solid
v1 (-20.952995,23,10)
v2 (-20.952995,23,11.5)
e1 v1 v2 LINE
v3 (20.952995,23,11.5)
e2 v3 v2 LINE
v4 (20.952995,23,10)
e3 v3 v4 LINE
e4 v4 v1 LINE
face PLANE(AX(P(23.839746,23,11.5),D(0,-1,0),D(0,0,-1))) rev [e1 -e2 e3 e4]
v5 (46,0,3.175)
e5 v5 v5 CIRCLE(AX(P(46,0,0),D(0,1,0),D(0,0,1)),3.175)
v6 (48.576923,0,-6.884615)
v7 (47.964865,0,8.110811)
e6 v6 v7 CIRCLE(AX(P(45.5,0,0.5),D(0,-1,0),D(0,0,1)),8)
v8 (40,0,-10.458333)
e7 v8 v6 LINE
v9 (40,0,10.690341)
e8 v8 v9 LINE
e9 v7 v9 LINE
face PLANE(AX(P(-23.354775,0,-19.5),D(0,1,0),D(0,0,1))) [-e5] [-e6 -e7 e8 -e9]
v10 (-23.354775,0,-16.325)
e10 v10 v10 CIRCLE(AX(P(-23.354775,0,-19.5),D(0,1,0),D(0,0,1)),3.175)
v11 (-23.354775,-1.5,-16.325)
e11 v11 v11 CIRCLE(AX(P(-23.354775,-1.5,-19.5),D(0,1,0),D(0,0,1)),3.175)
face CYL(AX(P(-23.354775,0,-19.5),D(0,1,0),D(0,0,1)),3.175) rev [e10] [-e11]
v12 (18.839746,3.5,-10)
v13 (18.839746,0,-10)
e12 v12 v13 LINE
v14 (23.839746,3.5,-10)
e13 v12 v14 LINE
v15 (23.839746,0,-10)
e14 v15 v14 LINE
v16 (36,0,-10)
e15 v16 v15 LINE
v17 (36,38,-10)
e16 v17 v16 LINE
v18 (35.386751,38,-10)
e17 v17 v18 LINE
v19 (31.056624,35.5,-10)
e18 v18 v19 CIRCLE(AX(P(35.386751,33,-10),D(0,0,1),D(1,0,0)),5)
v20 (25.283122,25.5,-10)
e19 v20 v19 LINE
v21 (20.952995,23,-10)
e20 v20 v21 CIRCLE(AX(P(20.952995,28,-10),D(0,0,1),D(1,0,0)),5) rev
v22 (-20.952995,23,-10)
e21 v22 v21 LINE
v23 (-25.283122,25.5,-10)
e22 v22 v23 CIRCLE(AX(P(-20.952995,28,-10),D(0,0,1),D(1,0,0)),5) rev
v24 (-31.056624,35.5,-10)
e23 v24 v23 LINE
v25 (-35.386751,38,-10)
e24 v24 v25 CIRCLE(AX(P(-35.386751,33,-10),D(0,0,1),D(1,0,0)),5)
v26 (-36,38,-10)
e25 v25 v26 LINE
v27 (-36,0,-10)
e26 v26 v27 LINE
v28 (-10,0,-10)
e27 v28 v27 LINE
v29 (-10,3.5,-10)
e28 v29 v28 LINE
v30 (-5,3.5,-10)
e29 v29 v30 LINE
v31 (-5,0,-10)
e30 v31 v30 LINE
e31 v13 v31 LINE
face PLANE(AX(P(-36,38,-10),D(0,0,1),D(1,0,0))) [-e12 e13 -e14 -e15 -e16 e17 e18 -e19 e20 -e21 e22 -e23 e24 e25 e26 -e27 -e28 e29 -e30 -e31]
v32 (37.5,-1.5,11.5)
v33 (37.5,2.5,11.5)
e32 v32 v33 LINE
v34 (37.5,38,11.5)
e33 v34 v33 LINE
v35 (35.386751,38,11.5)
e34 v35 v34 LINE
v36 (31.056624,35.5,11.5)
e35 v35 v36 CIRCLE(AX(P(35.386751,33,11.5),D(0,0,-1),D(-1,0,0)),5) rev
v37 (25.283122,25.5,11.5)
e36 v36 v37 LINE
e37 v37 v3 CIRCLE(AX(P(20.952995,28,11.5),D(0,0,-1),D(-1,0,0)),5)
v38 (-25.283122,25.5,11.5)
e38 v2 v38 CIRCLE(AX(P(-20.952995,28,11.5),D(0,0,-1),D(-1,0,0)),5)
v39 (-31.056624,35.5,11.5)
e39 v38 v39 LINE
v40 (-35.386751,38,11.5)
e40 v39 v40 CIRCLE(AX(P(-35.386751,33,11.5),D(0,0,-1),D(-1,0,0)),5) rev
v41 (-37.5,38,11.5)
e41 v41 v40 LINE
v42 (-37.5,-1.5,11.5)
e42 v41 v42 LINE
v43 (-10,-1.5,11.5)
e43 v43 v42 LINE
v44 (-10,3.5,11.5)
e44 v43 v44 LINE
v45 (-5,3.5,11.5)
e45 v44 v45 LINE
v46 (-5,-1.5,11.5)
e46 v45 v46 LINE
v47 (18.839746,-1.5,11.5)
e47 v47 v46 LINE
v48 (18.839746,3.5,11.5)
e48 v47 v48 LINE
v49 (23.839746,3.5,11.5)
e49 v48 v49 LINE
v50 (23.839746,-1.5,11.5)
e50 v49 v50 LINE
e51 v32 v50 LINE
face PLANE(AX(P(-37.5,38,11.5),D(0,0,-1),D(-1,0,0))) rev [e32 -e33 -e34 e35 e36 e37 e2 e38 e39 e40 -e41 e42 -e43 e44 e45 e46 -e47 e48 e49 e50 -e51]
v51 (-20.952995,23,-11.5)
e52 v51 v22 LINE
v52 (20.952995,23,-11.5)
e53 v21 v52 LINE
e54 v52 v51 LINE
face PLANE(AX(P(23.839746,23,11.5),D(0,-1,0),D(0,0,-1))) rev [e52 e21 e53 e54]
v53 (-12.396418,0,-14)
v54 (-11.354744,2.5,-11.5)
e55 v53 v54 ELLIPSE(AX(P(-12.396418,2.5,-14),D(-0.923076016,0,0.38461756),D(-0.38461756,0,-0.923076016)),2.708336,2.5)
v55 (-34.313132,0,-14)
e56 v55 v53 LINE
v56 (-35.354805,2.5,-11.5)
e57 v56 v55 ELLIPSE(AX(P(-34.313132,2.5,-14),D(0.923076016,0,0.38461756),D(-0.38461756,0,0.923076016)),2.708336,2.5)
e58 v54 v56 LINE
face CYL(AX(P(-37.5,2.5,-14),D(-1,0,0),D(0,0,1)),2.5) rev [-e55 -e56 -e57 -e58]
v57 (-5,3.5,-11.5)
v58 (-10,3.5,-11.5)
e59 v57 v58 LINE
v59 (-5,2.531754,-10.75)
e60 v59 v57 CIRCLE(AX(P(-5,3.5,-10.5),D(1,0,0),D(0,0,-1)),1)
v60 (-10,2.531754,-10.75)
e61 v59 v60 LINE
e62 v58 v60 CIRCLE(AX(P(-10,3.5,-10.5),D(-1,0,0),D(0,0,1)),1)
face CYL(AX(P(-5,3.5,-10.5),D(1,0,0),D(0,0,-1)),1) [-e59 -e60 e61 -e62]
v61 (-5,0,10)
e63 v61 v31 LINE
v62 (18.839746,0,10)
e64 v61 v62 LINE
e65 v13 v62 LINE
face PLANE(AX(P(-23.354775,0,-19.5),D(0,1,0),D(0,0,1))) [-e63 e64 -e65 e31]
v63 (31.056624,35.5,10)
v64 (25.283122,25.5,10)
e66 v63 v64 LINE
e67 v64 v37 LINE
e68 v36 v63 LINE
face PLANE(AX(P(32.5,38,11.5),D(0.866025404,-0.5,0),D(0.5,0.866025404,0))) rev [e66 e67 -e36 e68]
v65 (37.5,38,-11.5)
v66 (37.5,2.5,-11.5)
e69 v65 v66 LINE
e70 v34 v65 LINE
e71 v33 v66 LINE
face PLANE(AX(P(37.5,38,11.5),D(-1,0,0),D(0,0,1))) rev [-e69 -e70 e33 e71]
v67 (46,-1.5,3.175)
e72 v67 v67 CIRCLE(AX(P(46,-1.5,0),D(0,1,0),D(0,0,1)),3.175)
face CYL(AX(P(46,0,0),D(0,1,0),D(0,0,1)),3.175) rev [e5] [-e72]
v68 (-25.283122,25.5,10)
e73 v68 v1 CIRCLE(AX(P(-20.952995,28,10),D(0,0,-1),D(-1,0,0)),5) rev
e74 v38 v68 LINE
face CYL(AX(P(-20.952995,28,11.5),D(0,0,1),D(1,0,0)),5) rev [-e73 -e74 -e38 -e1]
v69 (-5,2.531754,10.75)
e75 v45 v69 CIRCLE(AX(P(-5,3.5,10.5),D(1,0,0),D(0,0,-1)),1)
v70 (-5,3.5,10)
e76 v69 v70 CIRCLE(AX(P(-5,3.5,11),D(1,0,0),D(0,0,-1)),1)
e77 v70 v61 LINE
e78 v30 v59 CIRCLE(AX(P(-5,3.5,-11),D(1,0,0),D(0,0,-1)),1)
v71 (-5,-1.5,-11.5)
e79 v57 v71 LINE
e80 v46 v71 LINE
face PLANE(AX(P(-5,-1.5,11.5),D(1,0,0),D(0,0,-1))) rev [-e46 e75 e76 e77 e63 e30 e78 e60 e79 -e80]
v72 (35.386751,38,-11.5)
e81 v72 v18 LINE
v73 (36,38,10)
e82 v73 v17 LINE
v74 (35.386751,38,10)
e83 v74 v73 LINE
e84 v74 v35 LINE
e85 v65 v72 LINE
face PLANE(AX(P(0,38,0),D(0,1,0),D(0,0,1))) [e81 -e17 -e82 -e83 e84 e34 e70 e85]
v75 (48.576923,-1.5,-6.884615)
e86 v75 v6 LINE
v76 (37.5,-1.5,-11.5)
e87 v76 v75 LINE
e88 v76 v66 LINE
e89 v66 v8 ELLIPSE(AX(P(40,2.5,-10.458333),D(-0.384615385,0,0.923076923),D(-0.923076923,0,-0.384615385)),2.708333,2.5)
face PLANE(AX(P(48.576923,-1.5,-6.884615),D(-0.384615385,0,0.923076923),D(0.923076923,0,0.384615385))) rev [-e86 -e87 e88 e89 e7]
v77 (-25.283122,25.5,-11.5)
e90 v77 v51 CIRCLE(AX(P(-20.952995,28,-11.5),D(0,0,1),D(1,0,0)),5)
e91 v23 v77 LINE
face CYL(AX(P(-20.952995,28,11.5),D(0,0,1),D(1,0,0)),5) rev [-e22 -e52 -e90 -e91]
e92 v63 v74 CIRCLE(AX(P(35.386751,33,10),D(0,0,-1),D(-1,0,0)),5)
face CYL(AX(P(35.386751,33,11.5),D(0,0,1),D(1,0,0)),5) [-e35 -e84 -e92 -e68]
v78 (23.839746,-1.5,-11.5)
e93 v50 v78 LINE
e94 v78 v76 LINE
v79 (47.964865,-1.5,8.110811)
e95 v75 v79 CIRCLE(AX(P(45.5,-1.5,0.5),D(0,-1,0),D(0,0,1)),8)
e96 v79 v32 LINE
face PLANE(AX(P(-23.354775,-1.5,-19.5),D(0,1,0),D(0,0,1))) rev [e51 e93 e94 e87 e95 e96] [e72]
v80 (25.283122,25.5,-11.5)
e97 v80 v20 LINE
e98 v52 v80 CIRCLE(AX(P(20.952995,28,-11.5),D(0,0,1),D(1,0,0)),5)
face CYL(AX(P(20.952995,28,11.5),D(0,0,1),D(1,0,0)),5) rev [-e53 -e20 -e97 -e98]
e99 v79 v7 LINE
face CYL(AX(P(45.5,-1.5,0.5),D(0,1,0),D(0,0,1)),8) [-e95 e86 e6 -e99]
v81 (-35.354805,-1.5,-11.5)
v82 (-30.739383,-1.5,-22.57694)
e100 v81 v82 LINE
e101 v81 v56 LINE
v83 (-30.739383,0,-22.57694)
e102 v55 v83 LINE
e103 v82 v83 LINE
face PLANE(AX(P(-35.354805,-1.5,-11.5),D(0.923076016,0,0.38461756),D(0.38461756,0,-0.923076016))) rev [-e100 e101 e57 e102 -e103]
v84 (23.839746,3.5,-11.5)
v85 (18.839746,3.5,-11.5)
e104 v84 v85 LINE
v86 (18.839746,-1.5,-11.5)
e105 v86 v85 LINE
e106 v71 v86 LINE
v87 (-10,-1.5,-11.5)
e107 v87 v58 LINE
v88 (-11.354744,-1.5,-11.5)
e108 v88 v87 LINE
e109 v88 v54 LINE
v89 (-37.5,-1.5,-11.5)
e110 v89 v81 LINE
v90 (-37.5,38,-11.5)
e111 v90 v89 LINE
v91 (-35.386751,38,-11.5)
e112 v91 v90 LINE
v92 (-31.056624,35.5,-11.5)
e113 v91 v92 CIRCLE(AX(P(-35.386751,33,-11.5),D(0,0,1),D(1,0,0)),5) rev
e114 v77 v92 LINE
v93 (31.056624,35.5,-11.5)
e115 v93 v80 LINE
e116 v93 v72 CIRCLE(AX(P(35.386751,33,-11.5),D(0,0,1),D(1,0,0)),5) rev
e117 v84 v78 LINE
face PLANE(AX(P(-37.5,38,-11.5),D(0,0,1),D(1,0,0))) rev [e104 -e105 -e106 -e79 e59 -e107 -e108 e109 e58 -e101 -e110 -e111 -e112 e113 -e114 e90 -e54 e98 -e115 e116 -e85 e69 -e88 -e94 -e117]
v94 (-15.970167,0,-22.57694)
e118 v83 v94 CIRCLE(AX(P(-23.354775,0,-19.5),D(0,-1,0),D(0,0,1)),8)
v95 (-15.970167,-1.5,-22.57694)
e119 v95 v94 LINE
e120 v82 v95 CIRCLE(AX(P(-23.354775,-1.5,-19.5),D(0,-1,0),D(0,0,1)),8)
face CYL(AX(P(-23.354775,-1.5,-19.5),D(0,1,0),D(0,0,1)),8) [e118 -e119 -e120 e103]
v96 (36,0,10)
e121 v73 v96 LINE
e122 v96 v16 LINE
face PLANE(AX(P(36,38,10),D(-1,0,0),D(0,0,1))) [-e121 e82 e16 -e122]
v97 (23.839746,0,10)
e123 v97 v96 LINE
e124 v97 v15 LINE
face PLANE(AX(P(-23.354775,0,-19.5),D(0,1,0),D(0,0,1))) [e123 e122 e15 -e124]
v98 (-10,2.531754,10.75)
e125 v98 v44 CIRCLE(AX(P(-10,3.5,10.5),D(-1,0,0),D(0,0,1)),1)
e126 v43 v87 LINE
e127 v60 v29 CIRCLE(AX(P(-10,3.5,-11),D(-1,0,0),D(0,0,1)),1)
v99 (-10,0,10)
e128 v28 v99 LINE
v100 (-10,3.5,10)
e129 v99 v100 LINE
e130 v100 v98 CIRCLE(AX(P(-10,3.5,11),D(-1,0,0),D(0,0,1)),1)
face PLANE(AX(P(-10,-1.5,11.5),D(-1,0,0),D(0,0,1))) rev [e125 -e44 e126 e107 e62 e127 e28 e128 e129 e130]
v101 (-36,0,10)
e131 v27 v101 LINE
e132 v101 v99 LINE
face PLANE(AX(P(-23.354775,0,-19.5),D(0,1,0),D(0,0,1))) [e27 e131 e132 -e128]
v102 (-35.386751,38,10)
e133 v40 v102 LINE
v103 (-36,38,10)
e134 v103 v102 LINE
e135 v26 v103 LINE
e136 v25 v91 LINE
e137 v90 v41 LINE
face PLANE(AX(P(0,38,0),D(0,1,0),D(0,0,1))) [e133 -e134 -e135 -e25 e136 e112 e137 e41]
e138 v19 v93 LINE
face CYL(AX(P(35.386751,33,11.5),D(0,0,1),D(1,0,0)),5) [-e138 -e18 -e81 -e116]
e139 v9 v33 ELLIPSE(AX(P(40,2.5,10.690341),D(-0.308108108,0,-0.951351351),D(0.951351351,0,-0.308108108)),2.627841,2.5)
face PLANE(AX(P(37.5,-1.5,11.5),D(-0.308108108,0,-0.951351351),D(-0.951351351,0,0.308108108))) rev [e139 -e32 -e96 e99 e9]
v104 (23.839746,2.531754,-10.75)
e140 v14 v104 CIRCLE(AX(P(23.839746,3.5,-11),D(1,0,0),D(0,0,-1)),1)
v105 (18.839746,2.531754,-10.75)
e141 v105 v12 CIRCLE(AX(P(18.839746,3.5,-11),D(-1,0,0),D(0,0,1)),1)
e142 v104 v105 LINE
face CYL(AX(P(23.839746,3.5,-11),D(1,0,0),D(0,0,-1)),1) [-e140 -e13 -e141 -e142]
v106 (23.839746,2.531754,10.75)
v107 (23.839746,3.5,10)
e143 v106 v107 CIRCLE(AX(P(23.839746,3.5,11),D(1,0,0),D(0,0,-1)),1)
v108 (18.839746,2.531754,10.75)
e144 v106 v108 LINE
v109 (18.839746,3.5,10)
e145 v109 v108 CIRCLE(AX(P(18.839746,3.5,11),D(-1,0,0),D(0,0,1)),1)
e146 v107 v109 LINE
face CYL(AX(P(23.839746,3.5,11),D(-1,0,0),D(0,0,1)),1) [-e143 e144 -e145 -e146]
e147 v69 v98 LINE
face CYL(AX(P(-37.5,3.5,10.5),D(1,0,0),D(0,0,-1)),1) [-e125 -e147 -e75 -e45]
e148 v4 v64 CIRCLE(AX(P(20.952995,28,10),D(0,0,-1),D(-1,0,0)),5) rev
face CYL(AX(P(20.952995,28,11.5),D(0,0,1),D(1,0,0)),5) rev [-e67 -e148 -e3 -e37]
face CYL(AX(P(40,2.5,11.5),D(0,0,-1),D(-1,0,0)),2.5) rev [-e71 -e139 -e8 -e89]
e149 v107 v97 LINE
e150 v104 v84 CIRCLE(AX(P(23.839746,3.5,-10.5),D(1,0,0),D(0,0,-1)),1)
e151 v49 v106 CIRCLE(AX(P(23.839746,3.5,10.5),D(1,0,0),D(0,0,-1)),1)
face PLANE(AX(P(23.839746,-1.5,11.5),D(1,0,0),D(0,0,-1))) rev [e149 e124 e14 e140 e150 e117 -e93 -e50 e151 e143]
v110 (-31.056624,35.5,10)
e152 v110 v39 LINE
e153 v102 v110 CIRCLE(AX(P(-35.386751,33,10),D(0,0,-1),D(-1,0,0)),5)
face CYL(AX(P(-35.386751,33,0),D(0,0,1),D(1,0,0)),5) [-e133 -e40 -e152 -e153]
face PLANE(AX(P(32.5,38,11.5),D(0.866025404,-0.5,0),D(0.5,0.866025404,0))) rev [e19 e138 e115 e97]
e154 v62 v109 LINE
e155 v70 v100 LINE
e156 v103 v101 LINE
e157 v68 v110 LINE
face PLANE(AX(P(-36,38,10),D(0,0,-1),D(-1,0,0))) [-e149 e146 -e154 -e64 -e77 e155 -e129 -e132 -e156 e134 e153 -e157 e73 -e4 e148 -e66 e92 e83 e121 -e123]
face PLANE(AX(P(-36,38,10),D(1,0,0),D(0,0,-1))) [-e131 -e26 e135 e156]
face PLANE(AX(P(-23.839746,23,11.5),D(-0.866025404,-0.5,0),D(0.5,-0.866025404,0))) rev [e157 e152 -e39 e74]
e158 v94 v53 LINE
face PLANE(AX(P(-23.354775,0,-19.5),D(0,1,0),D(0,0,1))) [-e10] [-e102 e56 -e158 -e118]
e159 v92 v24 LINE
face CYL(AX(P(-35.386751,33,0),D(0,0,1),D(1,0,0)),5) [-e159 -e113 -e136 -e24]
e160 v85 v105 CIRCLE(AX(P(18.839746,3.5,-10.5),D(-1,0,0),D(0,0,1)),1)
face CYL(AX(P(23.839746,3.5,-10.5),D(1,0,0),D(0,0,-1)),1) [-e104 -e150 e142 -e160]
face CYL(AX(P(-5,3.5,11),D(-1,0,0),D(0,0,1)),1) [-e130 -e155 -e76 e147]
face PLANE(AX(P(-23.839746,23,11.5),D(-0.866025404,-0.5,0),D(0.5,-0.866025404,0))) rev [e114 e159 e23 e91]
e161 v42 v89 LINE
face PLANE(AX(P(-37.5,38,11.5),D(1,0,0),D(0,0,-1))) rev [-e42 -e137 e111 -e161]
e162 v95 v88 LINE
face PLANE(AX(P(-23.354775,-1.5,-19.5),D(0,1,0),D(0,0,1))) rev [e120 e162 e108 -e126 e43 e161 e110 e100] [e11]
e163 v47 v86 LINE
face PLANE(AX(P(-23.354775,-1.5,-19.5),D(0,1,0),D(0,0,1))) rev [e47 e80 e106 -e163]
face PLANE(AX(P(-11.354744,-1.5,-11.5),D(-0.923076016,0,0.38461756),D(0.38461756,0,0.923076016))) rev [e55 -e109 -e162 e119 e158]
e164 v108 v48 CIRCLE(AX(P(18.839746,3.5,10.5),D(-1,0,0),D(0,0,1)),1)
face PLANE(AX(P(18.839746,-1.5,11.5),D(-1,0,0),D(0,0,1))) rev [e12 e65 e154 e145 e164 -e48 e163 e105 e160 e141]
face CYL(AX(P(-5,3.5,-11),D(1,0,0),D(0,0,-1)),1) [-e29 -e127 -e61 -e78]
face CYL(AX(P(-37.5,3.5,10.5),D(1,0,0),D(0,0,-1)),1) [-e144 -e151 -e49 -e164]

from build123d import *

# Parameters (mm, degrees)
SKETCH15_W                  = 75
SKETCH15_H                  = 23
SKETCH15_W_2                = 72
SKETCH15_H_2                = 20
BOSS_EXTRUDE8_DEPTH         = 38
BOSS_EXTRUDE11_DEPTH        = 1.5
F_1_4_0_25_DIAMETER_HOLE1_D = 6.35
SKETCH21_W                  = 5
SKETCH21_H                  = 4
CUT_EXTRUDE1_DEPTH          = 70.535961919
FILLET1_R                   = 5
FILLET2_R                   = 1
FILLET3_R                   = 2.5


with BuildPart() as part:
    # Sketch15 → Boss-Extrude8 (new body)
    with BuildSketch(Plane(origin=(0, 0, 0), x_dir=(1, 0, 0), z_dir=(0, 1, 0))):
        Rectangle(SKETCH15_W, SKETCH15_H)
        Rectangle(SKETCH15_W_2, SKETCH15_H_2, mode=Mode.SUBTRACT)
    extrude(amount=BOSS_EXTRUDE8_DEPTH)

    # Sketch18 → Boss-Extrude11 (add)
    with BuildSketch(Plane.XZ):
        with BuildLine():
            Line((-37.5, 11.5), (37.5, 11.5))
            Line((37.5, 11.5), (47.964864865, 8.110810811))
            ThreePointArc((47.964864865, 8.110810811), (53.493344425, 0.826258956), (48.576923077, -6.884615385))
            Line((48.576923077, -6.884615385), (37.5, -11.5))
            Line((37.5, -11.5), (-11.354744065, -11.5))
            Line((-11.354744065, -11.5), (-15.970166575, -22.576940483))
            ThreePointArc((-15.970166575, -22.576940483), (-23.354774707, -27.5), (-30.739382839, -22.576940483))
            Line((-30.739382839, -22.576940483), (-35.35480535, -11.5))
            Line((-35.35480535, -11.5), (-37.5, -11.5))
            Line((-37.5, -11.5), (-37.5, 11.5))
        make_face()
    extrude(amount=BOSS_EXTRUDE11_DEPTH)

    # 1/4 (0.25) Diameter Hole1 (through all)
    with Locations(Plane(origin=(0, 0, 0), x_dir=(1, 0, 0), z_dir=(0, 1, 0))):
        with Locations((46, 0), (-23.354774707, 19.5)):
            Hole(F_1_4_0_25_DIAMETER_HOLE1_D / 2)

    # Sketch21 → Cut-Extrude1 (cut, through all)
    with BuildSketch(Plane(origin=(0, 0, -11.5), x_dir=(-1, 0, 0), z_dir=(0, 0, -1))):
        Polygon((-32.5, 38), (-23.839745962, 23), (23.839745962, 23), (32.5, 38), align=None)
        with Locations((-21.339745962, 0.5)):
            Rectangle(SKETCH21_W, SKETCH21_H)
        with Locations((7.5, 0.5)):
            Rectangle(SKETCH21_W, SKETCH21_H)
    extrude(amount=-CUT_EXTRUDE1_DEPTH, mode=Mode.SUBTRACT)

    # Fillet1
    fillet1_edges = [part.edges().sort_by_distance(p)[0] for p in [
        (32.5, 38, -10.75),
        (-32.5, 38, -10.75),
        (-23.839745962, 23, -10.75),
        (23.839745962, 23, -10.75),
        (32.5, 38, 10.75),
        (-32.5, 38, 10.75),
        (-23.839745962, 23, 10.75),
        (23.839745962, 23, 10.75),
    ]]
    fillet(fillet1_edges, radius=FILLET1_R)

    # Fillet2
    # the kernel refuses this fillet: 1 mm, written as the material it takes off along each edge
    with BuildSketch(Plane(origin=(18.839745962, 2.5, -11.5), x_dir=(0, 1, 0), z_dir=(1, 0, 0)), Plane(origin=(23.839745962, 2.5, -10), x_dir=(0, 1, 0), z_dir=(-1, 0, 0)), Plane(origin=(18.839745962, 2.5, 10), x_dir=(0, 1, 0), z_dir=(1, 0, 0)), Plane(origin=(23.839745962, 2.5, 11.5), x_dir=(0, 1, 0), z_dir=(-1, 0, 0)), Plane(origin=(-10, 2.5, -11.5), x_dir=(0, 1, 0), z_dir=(1, 0, 0)), Plane(origin=(-5, 2.5, -10), x_dir=(0, 1, 0), z_dir=(-1, 0, 0)), Plane(origin=(-10, 2.5, 10), x_dir=(0, 1, 0), z_dir=(1, 0, 0)), Plane(origin=(-5, 2.5, 11.5), x_dir=(0, 1, 0), z_dir=(-1, 0, 0))) as fillet2_piece_1:
        with BuildLine():
            CenterArc((FILLET2_R, FILLET2_R), FILLET2_R, 180, 90)
            Line((0, FILLET2_R), (0, 0))
            Line((0, 0), (FILLET2_R, 0))
        make_face()
    extrude(amount=5, mode=Mode.SUBTRACT)

    # Fillet3
    fillet3_edges = [part.edges().sort_by_distance(p)[0] for p in [
        (-23.354774707, 0, -11.5),
        (37.5, 0, 0),
    ]]
    fillet(fillet3_edges, radius=FILLET3_R)


solid = part.part
